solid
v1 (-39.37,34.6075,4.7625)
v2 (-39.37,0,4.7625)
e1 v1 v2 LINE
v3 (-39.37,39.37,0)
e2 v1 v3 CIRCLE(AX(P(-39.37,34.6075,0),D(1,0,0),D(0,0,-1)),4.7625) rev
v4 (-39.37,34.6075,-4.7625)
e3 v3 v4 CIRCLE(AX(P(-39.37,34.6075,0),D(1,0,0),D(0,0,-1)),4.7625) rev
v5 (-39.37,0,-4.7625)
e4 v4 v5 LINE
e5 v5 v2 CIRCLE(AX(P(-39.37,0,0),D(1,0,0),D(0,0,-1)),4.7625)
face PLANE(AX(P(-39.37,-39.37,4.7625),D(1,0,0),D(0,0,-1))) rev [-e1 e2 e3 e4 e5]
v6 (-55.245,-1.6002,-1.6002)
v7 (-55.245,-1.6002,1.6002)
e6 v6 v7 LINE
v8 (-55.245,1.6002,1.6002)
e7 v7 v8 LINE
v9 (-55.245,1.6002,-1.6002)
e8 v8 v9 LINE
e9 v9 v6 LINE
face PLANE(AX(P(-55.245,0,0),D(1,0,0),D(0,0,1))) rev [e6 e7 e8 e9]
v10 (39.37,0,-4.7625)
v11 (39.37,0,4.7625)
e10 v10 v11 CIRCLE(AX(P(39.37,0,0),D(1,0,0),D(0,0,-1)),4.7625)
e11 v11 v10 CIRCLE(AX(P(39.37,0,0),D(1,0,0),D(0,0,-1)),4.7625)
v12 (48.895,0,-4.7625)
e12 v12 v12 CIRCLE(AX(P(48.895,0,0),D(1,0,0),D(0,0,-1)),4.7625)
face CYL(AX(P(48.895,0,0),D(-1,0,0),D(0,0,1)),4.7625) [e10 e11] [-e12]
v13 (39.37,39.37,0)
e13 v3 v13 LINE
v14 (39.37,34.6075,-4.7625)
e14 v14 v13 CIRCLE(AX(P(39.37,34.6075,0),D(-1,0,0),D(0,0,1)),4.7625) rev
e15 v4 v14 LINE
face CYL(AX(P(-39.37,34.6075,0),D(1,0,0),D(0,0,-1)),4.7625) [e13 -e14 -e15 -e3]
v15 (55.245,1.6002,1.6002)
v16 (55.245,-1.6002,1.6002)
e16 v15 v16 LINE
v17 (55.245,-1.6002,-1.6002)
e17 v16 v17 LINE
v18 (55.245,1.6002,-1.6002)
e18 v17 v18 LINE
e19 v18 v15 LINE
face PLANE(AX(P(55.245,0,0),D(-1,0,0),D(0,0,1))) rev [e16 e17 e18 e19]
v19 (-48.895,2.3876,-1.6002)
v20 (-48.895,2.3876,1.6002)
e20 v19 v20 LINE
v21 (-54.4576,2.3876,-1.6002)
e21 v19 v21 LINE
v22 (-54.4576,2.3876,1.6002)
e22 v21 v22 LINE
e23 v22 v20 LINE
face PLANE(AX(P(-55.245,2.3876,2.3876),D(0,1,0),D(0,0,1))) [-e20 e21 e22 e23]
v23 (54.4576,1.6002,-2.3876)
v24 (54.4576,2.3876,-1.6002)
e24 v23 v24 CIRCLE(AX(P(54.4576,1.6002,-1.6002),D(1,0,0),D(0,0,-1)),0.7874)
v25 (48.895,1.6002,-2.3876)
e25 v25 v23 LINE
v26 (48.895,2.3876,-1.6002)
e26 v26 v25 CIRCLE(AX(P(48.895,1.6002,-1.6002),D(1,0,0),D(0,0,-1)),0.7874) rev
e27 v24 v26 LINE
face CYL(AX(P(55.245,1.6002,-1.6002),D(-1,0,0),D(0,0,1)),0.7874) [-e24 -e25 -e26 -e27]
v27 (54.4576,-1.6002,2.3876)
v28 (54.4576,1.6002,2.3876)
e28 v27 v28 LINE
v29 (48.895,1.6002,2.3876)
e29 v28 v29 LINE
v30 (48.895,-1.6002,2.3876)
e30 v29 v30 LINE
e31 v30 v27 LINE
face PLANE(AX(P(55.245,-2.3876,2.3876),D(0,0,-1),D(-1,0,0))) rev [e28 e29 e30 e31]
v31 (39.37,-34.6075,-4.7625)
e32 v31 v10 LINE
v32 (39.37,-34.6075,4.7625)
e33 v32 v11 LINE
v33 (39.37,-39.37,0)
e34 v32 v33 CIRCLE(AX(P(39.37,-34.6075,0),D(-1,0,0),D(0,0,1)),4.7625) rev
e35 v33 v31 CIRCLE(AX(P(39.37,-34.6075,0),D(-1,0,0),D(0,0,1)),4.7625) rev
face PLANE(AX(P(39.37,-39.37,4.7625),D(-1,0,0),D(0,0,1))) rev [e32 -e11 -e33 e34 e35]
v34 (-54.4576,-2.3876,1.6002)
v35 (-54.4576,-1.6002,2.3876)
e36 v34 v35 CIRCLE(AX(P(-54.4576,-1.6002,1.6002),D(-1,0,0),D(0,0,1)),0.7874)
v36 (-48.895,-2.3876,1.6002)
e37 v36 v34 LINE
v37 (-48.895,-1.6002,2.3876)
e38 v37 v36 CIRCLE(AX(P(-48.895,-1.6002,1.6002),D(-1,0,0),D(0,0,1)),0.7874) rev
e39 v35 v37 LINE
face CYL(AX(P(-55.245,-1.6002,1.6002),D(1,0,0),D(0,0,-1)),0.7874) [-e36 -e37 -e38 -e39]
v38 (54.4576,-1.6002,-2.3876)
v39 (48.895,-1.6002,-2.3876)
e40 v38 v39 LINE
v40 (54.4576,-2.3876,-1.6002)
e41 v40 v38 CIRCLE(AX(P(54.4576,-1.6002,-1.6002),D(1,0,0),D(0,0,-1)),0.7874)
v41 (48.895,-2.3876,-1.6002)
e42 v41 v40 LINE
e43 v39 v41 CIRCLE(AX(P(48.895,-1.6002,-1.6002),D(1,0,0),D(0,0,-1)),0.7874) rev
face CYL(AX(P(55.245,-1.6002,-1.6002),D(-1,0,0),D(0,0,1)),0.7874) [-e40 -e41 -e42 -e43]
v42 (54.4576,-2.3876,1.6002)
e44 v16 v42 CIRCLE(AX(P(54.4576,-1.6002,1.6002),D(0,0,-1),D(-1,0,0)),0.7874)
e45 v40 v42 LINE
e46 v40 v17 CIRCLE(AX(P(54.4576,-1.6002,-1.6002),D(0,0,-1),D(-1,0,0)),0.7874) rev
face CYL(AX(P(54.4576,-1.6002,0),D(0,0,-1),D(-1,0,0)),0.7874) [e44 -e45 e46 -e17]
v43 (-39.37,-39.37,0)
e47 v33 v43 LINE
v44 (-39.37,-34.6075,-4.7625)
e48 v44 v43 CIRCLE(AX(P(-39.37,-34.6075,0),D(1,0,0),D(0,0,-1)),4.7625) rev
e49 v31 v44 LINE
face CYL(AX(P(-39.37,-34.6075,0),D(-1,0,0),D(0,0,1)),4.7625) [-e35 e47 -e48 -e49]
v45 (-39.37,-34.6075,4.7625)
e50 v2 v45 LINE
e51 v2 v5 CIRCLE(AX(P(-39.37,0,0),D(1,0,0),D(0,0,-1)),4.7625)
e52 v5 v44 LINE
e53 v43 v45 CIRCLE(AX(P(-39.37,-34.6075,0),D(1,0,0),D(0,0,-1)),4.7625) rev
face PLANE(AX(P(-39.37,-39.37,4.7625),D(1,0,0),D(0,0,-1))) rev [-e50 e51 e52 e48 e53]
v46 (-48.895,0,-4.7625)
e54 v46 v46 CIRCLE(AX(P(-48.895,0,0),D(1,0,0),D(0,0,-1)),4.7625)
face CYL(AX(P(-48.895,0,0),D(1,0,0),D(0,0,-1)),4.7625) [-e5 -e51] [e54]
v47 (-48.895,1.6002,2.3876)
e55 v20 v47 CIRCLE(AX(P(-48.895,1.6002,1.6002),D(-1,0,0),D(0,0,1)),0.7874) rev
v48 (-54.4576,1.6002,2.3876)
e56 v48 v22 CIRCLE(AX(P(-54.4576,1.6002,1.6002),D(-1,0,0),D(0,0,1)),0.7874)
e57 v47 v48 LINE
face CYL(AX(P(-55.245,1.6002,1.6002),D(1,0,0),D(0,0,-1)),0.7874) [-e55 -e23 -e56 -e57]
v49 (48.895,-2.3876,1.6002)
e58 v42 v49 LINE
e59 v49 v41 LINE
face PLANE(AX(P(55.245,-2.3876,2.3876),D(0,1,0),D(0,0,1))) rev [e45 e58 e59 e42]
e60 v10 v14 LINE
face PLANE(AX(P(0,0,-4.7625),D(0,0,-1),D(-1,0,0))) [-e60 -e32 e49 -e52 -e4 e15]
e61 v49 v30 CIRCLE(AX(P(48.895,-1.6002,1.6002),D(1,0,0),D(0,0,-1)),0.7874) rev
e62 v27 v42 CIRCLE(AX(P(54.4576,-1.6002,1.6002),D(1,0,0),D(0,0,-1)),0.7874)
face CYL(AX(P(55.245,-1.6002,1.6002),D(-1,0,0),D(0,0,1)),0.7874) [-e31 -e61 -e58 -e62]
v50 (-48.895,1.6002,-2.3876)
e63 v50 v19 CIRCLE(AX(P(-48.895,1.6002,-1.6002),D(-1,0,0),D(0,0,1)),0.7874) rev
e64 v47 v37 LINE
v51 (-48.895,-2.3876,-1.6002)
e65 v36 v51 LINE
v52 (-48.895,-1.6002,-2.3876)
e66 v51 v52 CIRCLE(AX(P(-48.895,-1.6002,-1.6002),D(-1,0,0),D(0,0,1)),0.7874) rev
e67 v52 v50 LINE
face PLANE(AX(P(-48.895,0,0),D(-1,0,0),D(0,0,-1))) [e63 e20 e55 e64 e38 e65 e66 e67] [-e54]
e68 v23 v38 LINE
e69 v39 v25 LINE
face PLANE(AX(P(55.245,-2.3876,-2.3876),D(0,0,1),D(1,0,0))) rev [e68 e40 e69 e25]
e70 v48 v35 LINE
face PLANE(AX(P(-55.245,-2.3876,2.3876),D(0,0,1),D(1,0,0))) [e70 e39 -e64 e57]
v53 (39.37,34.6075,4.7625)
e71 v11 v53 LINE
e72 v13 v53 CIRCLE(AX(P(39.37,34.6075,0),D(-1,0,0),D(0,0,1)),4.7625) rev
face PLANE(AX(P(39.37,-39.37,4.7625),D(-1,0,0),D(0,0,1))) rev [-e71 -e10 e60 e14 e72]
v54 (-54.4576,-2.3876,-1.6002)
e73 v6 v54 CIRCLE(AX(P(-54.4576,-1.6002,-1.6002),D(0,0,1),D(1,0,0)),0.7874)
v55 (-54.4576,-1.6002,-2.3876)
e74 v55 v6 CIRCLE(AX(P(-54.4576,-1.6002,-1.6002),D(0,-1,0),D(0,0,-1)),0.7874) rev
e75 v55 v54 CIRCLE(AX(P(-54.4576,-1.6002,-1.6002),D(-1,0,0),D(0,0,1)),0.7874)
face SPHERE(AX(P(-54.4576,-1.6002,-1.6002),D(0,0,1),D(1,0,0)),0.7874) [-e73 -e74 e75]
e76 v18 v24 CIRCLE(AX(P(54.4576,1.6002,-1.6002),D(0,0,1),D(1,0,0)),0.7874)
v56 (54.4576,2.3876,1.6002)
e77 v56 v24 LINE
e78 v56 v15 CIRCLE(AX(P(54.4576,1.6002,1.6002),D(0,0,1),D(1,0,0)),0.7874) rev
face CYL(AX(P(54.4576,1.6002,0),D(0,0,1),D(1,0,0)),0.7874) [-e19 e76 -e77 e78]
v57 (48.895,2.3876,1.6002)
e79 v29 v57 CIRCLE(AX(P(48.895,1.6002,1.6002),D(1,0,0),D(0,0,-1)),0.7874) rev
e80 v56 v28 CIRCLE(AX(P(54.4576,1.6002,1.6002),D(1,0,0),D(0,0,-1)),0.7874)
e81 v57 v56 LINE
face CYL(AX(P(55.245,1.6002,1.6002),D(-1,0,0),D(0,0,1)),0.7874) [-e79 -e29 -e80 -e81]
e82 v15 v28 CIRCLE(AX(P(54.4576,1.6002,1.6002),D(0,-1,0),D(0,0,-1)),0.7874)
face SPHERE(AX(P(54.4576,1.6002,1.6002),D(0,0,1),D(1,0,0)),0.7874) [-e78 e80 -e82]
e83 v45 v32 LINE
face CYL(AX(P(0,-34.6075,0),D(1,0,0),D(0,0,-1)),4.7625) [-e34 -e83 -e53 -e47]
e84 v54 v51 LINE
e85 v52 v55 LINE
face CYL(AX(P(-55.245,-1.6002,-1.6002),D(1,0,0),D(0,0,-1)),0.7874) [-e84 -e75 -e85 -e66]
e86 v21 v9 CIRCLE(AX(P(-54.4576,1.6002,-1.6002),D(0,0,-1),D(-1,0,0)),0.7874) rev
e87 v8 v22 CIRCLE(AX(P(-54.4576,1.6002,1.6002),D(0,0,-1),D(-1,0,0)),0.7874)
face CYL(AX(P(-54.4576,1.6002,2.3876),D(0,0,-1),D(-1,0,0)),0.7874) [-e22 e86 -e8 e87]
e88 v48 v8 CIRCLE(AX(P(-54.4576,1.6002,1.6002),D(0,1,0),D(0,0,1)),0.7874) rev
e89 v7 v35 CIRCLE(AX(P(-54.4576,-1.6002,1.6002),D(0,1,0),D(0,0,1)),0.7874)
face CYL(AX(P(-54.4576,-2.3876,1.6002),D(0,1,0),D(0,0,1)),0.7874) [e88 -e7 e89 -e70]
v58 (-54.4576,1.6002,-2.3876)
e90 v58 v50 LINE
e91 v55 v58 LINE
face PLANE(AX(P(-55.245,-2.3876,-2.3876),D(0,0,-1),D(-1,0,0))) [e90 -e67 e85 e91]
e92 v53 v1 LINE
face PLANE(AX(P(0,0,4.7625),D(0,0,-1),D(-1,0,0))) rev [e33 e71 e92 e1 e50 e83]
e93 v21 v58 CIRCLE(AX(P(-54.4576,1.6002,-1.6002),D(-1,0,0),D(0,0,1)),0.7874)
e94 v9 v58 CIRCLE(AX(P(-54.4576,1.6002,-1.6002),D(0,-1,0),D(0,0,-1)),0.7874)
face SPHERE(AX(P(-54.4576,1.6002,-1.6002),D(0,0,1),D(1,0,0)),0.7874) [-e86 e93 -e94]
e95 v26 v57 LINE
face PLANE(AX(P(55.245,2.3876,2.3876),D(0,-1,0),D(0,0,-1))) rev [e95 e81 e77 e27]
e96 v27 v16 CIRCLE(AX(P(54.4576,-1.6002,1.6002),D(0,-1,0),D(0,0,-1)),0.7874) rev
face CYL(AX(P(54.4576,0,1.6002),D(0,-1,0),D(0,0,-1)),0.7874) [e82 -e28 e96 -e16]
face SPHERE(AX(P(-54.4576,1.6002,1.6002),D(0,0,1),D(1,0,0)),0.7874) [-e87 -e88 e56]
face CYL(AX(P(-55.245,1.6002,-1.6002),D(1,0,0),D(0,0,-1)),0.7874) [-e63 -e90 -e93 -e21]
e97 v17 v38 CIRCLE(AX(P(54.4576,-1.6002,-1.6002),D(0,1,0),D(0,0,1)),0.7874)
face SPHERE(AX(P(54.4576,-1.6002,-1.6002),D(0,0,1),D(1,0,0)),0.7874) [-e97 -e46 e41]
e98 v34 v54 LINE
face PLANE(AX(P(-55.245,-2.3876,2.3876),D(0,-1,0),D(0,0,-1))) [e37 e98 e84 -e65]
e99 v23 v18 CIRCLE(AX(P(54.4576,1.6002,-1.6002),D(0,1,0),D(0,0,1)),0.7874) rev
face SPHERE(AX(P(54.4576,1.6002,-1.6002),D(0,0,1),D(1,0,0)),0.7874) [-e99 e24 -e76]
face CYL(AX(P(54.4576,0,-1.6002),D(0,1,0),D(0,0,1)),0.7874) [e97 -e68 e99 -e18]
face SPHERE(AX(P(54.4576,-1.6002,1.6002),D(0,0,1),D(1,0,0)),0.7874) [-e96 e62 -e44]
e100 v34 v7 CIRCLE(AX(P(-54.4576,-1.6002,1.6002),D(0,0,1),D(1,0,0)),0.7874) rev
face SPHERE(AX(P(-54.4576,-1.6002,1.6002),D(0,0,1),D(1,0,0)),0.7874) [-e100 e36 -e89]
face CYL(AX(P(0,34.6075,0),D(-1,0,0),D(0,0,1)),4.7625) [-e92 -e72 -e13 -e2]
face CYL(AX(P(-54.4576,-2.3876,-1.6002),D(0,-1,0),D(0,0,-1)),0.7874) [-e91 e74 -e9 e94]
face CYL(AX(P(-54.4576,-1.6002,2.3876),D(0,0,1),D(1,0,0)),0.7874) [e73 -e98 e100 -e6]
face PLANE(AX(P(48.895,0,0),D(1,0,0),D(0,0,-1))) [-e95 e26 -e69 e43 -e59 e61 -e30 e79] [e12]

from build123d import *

# Parameters (mm, degrees)
SKETCH1_W           = 78.74
SKETCH1_H           = 78.74
BOSS_EXTRUDE1_DEPTH = 4.7625
SKETCH2_R           = 4.7625
BOSS_EXTRUDE2_DEPTH = 9.525
SKETCH3_W           = 4.7752
SKETCH3_H           = 4.7752
BOSS_EXTRUDE3_DEPTH = 6.35
FILLET2_R           = 4.7625
FILLET3_R           = 0.7874
FILLET4_R           = 0.7874
FILLET5_R           = 0.7874


# Some blends are built 0.0001 mm under size
with BuildPart() as part:
    # Sketch1 → Boss-Extrude1 (new, symmetric)
    with BuildSketch(Plane.XY):
        Rectangle(SKETCH1_W, SKETCH1_H)
    extrude(amount=BOSS_EXTRUDE1_DEPTH, both=True)

    # Sketch2 → Boss-Extrude2 (add)
    with BuildSketch(Plane(origin=(39.37, 0, 0), x_dir=(0, 0, -1), z_dir=(1, 0, 0))):
        Circle(SKETCH2_R)
    boss_extrude2 = extrude(amount=BOSS_EXTRUDE2_DEPTH)

    # Sketch3 → Boss-Extrude3 (add)
    with BuildSketch(Plane(origin=(48.895, 0, 0), x_dir=(0, 0, -1), z_dir=(1, 0, 0))):
        Rectangle(SKETCH3_W, SKETCH3_H)
    boss_extrude3 = extrude(amount=BOSS_EXTRUDE3_DEPTH)

    # Mirror1: Boss-Extrude2, Boss-Extrude3 across plane
    add(boss_extrude2.mirror(Plane(origin=(0, 0, 0), x_dir=(0, 0, 1), z_dir=(1, 0, 0))))
    add(boss_extrude3.mirror(Plane(origin=(0, 0, 0), x_dir=(0, 0, 1), z_dir=(1, 0, 0))))

    # Fillet2
    fillet2_edges = [part.edges().sort_by_distance(p)[0] for p in [
        (0, -39.37, -4.7625),
        (0, -39.37, 4.7625),
        (0, 39.37, -4.7625),
        (0, 39.37, 4.7625),
    ]]
    fillet(fillet2_edges, radius=FILLET2_R - 0.0001)  # a hair under: the kernel refuses the full size

    # Fillet3
    fillet3_edges = [part.edges().sort_by_distance(p)[0] for p in [
        (-55.245, 0, -2.3876),
        (-55.245, -2.3876, 0),
        (-55.245, 0, 2.3876),
        (-55.245, 2.3876, 0),
    ]]
    fillet(fillet3_edges, radius=FILLET3_R)

    # Fillet4
    fillet4_edges = [part.edges().sort_by_distance(p)[0] for p in [
        (55.245, 0, -2.3876),
        (55.245, 2.3876, 0),
        (55.245, 0, 2.3876),
        (55.245, -2.3876, 0),
    ]]
    fillet(fillet4_edges, radius=FILLET4_R)

    # Fillet5
    # the kernel refuses this fillet: 0.7874 mm, written as the material it takes off along each edge
    with BuildSketch(Plane(origin=(54.4576, -1.6002, -1.6002), x_dir=(0, 0, -1), z_dir=(0, -1, 0))) as fillet5_piece_1_section:
        Polygon((0, 0), (FILLET5_R, 0), (FILLET5_R, FILLET5_R), (0, FILLET5_R), align=None)
    fillet5_piece_1 = extrude(amount=FILLET5_R, mode=Mode.PRIVATE)
    fillet5_piece_1 = fillet5_piece_1 - Plane(origin=(54.4576, -1.6002, -1.6002), x_dir=(-0.7071067811865475, 0, 0.7071067811865475), z_dir=(0, -1, 0)) * Sphere(FILLET5_R, mode=Mode.PRIVATE)
    add(fillet5_piece_1, mode=Mode.SUBTRACT)
    with BuildSketch(Plane(origin=(54.4576, -1.6002, 1.6002), x_dir=(0, 0, 1), z_dir=(0, -1, 0))) as fillet5_piece_2_section:
        Polygon((0, 0), (FILLET5_R, 0), (FILLET5_R, -FILLET5_R), (0, -FILLET5_R), align=None)
    fillet5_piece_2 = extrude(amount=FILLET5_R, mode=Mode.PRIVATE)
    fillet5_piece_2 = fillet5_piece_2 - Plane(origin=(54.4576, -1.6002, 1.6002), x_dir=(-0.7071067811865475, 0, -0.7071067811865475), z_dir=(0, -1, 0)) * Sphere(FILLET5_R, mode=Mode.PRIVATE)
    add(fillet5_piece_2, mode=Mode.SUBTRACT)
    with BuildSketch(Plane(origin=(54.4576, 1.6002, -1.6002), x_dir=(0, 1, 0), z_dir=(0, 0, -1))) as fillet5_piece_3_section:
        Polygon((0, 0), (FILLET5_R, 0), (FILLET5_R, FILLET5_R), (0, FILLET5_R), align=None)
    fillet5_piece_3 = extrude(amount=FILLET5_R, mode=Mode.PRIVATE)
    fillet5_piece_3 = fillet5_piece_3 - Plane(origin=(54.4576, 1.6002, -1.6002), x_dir=(-0.7071067811865475, -0.7071067811865475, 0), z_dir=(0, 0, -1)) * Sphere(FILLET5_R, mode=Mode.PRIVATE)
    add(fillet5_piece_3, mode=Mode.SUBTRACT)
    with BuildSketch(Plane(origin=(54.4576, 1.6002, 1.6002), x_dir=(0, 1, 0), z_dir=(0, 0, 1))) as fillet5_piece_4_section:
        Polygon((0, 0), (FILLET5_R, 0), (FILLET5_R, -FILLET5_R), (0, -FILLET5_R), align=None)
    fillet5_piece_4 = extrude(amount=FILLET5_R, mode=Mode.PRIVATE)
    fillet5_piece_4 = fillet5_piece_4 - Plane(origin=(54.4576, 1.6002, 1.6002), x_dir=(-0.7071067811865475, -0.7071067811865475, 0), z_dir=(0, 0, 1)) * Sphere(FILLET5_R, mode=Mode.PRIVATE)
    add(fillet5_piece_4, mode=Mode.SUBTRACT)
    with BuildSketch(Plane(origin=(-54.4576, 1.6002, 1.6002), x_dir=(0, 0, 1), z_dir=(0, 1, 0))) as fillet5_piece_5_section:
        Polygon((0, 0), (FILLET5_R, 0), (FILLET5_R, -FILLET5_R), (0, -FILLET5_R), align=None)
    fillet5_piece_5 = extrude(amount=FILLET5_R, mode=Mode.PRIVATE)
    fillet5_piece_5 = fillet5_piece_5 - Plane(origin=(-54.4576, 1.6002, 1.6002), x_dir=(0.7071067811865475, 0, -0.7071067811865475), z_dir=(0, 1, 0)) * Sphere(FILLET5_R, mode=Mode.PRIVATE)
    add(fillet5_piece_5, mode=Mode.SUBTRACT)
    with BuildSketch(Plane(origin=(-54.4576, 1.6002, -1.6002), x_dir=(0, 1, 0), z_dir=(0, 0, -1))) as fillet5_piece_6_section:
        Polygon((0, 0), (FILLET5_R, 0), (FILLET5_R, -FILLET5_R), (0, -FILLET5_R), align=None)
    fillet5_piece_6 = extrude(amount=FILLET5_R, mode=Mode.PRIVATE)
    fillet5_piece_6 = fillet5_piece_6 - Plane(origin=(-54.4576, 1.6002, -1.6002), x_dir=(0.7071067811865475, -0.7071067811865475, 0), z_dir=(0, 0, -1)) * Sphere(FILLET5_R, mode=Mode.PRIVATE)
    add(fillet5_piece_6, mode=Mode.SUBTRACT)
    with BuildSketch(Plane(origin=(-54.4576, -1.6002, 1.6002), x_dir=(0, 0, 1), z_dir=(0, -1, 0))) as fillet5_piece_7_section:
        Polygon((0, 0), (FILLET5_R, 0), (FILLET5_R, FILLET5_R), (0, FILLET5_R), align=None)
    fillet5_piece_7 = extrude(amount=FILLET5_R, mode=Mode.PRIVATE)
    fillet5_piece_7 = fillet5_piece_7 - Plane(origin=(-54.4576, -1.6002, 1.6002), x_dir=(0.7071067811865475, 0, -0.7071067811865475), z_dir=(0, -1, 0)) * Sphere(FILLET5_R, mode=Mode.PRIVATE)
    add(fillet5_piece_7, mode=Mode.SUBTRACT)
    with BuildSketch(Plane(origin=(-54.4576, -1.6002, -1.6002), x_dir=(0, 0, -1), z_dir=(0, -1, 0))) as fillet5_piece_8_section:
        Polygon((0, 0), (FILLET5_R, 0), (FILLET5_R, -FILLET5_R), (0, -FILLET5_R), align=None)
    fillet5_piece_8 = extrude(amount=FILLET5_R, mode=Mode.PRIVATE)
    fillet5_piece_8 = fillet5_piece_8 - Plane(origin=(-54.4576, -1.6002, -1.6002), x_dir=(0.7071067811865475, 0, 0.7071067811865475), z_dir=(0, -1, 0)) * Sphere(FILLET5_R, mode=Mode.PRIVATE)
    add(fillet5_piece_8, mode=Mode.SUBTRACT)
    with BuildSketch(Plane(origin=(48.895, -2.3876, -2.3876), x_dir=(0, 0, 1), z_dir=(1, 0, 0)), Plane(origin=(-48.895, -2.3876, 2.3876), x_dir=(0, 0, -1), z_dir=(-1, 0, 0)), Plane(origin=(48.895, 2.3876, -2.3876), x_dir=(0, -1, 0), z_dir=(1, 0, 0))) as fillet5_piece_9:
        with BuildLine():
            CenterArc((FILLET5_R, -FILLET5_R), FILLET5_R, 90, 90)
            Line((0, -FILLET5_R), (0, 0))
            Line((0, 0), (FILLET5_R, 0))
        make_face()
    extrude(amount=5.5626, mode=Mode.SUBTRACT)
    with BuildSketch(Plane(origin=(-48.895, -2.3876, -2.3876), x_dir=(0, 0, 1), z_dir=(-1, 0, 0)), Plane(origin=(-48.895, 2.3876, -2.3876), x_dir=(0, -1, 0), z_dir=(-1, 0, 0)), Plane(origin=(-48.895, 2.3876, 2.3876), x_dir=(0, 0, -1), z_dir=(-1, 0, 0)), Plane(origin=(48.895, 2.3876, 2.3876), x_dir=(0, -1, 0), z_dir=(1, 0, 0)), Plane(origin=(48.895, -2.3876, 2.3876), x_dir=(0, 0, -1), z_dir=(1, 0, 0))) as fillet5_piece_10:
        with BuildLine():
            CenterArc((FILLET5_R, FILLET5_R), FILLET5_R, 180, 90)
            Line((0, FILLET5_R), (0, 0))
            Line((0, 0), (FILLET5_R, 0))
        make_face()
    extrude(amount=5.5626, mode=Mode.SUBTRACT)


solid = part.part
